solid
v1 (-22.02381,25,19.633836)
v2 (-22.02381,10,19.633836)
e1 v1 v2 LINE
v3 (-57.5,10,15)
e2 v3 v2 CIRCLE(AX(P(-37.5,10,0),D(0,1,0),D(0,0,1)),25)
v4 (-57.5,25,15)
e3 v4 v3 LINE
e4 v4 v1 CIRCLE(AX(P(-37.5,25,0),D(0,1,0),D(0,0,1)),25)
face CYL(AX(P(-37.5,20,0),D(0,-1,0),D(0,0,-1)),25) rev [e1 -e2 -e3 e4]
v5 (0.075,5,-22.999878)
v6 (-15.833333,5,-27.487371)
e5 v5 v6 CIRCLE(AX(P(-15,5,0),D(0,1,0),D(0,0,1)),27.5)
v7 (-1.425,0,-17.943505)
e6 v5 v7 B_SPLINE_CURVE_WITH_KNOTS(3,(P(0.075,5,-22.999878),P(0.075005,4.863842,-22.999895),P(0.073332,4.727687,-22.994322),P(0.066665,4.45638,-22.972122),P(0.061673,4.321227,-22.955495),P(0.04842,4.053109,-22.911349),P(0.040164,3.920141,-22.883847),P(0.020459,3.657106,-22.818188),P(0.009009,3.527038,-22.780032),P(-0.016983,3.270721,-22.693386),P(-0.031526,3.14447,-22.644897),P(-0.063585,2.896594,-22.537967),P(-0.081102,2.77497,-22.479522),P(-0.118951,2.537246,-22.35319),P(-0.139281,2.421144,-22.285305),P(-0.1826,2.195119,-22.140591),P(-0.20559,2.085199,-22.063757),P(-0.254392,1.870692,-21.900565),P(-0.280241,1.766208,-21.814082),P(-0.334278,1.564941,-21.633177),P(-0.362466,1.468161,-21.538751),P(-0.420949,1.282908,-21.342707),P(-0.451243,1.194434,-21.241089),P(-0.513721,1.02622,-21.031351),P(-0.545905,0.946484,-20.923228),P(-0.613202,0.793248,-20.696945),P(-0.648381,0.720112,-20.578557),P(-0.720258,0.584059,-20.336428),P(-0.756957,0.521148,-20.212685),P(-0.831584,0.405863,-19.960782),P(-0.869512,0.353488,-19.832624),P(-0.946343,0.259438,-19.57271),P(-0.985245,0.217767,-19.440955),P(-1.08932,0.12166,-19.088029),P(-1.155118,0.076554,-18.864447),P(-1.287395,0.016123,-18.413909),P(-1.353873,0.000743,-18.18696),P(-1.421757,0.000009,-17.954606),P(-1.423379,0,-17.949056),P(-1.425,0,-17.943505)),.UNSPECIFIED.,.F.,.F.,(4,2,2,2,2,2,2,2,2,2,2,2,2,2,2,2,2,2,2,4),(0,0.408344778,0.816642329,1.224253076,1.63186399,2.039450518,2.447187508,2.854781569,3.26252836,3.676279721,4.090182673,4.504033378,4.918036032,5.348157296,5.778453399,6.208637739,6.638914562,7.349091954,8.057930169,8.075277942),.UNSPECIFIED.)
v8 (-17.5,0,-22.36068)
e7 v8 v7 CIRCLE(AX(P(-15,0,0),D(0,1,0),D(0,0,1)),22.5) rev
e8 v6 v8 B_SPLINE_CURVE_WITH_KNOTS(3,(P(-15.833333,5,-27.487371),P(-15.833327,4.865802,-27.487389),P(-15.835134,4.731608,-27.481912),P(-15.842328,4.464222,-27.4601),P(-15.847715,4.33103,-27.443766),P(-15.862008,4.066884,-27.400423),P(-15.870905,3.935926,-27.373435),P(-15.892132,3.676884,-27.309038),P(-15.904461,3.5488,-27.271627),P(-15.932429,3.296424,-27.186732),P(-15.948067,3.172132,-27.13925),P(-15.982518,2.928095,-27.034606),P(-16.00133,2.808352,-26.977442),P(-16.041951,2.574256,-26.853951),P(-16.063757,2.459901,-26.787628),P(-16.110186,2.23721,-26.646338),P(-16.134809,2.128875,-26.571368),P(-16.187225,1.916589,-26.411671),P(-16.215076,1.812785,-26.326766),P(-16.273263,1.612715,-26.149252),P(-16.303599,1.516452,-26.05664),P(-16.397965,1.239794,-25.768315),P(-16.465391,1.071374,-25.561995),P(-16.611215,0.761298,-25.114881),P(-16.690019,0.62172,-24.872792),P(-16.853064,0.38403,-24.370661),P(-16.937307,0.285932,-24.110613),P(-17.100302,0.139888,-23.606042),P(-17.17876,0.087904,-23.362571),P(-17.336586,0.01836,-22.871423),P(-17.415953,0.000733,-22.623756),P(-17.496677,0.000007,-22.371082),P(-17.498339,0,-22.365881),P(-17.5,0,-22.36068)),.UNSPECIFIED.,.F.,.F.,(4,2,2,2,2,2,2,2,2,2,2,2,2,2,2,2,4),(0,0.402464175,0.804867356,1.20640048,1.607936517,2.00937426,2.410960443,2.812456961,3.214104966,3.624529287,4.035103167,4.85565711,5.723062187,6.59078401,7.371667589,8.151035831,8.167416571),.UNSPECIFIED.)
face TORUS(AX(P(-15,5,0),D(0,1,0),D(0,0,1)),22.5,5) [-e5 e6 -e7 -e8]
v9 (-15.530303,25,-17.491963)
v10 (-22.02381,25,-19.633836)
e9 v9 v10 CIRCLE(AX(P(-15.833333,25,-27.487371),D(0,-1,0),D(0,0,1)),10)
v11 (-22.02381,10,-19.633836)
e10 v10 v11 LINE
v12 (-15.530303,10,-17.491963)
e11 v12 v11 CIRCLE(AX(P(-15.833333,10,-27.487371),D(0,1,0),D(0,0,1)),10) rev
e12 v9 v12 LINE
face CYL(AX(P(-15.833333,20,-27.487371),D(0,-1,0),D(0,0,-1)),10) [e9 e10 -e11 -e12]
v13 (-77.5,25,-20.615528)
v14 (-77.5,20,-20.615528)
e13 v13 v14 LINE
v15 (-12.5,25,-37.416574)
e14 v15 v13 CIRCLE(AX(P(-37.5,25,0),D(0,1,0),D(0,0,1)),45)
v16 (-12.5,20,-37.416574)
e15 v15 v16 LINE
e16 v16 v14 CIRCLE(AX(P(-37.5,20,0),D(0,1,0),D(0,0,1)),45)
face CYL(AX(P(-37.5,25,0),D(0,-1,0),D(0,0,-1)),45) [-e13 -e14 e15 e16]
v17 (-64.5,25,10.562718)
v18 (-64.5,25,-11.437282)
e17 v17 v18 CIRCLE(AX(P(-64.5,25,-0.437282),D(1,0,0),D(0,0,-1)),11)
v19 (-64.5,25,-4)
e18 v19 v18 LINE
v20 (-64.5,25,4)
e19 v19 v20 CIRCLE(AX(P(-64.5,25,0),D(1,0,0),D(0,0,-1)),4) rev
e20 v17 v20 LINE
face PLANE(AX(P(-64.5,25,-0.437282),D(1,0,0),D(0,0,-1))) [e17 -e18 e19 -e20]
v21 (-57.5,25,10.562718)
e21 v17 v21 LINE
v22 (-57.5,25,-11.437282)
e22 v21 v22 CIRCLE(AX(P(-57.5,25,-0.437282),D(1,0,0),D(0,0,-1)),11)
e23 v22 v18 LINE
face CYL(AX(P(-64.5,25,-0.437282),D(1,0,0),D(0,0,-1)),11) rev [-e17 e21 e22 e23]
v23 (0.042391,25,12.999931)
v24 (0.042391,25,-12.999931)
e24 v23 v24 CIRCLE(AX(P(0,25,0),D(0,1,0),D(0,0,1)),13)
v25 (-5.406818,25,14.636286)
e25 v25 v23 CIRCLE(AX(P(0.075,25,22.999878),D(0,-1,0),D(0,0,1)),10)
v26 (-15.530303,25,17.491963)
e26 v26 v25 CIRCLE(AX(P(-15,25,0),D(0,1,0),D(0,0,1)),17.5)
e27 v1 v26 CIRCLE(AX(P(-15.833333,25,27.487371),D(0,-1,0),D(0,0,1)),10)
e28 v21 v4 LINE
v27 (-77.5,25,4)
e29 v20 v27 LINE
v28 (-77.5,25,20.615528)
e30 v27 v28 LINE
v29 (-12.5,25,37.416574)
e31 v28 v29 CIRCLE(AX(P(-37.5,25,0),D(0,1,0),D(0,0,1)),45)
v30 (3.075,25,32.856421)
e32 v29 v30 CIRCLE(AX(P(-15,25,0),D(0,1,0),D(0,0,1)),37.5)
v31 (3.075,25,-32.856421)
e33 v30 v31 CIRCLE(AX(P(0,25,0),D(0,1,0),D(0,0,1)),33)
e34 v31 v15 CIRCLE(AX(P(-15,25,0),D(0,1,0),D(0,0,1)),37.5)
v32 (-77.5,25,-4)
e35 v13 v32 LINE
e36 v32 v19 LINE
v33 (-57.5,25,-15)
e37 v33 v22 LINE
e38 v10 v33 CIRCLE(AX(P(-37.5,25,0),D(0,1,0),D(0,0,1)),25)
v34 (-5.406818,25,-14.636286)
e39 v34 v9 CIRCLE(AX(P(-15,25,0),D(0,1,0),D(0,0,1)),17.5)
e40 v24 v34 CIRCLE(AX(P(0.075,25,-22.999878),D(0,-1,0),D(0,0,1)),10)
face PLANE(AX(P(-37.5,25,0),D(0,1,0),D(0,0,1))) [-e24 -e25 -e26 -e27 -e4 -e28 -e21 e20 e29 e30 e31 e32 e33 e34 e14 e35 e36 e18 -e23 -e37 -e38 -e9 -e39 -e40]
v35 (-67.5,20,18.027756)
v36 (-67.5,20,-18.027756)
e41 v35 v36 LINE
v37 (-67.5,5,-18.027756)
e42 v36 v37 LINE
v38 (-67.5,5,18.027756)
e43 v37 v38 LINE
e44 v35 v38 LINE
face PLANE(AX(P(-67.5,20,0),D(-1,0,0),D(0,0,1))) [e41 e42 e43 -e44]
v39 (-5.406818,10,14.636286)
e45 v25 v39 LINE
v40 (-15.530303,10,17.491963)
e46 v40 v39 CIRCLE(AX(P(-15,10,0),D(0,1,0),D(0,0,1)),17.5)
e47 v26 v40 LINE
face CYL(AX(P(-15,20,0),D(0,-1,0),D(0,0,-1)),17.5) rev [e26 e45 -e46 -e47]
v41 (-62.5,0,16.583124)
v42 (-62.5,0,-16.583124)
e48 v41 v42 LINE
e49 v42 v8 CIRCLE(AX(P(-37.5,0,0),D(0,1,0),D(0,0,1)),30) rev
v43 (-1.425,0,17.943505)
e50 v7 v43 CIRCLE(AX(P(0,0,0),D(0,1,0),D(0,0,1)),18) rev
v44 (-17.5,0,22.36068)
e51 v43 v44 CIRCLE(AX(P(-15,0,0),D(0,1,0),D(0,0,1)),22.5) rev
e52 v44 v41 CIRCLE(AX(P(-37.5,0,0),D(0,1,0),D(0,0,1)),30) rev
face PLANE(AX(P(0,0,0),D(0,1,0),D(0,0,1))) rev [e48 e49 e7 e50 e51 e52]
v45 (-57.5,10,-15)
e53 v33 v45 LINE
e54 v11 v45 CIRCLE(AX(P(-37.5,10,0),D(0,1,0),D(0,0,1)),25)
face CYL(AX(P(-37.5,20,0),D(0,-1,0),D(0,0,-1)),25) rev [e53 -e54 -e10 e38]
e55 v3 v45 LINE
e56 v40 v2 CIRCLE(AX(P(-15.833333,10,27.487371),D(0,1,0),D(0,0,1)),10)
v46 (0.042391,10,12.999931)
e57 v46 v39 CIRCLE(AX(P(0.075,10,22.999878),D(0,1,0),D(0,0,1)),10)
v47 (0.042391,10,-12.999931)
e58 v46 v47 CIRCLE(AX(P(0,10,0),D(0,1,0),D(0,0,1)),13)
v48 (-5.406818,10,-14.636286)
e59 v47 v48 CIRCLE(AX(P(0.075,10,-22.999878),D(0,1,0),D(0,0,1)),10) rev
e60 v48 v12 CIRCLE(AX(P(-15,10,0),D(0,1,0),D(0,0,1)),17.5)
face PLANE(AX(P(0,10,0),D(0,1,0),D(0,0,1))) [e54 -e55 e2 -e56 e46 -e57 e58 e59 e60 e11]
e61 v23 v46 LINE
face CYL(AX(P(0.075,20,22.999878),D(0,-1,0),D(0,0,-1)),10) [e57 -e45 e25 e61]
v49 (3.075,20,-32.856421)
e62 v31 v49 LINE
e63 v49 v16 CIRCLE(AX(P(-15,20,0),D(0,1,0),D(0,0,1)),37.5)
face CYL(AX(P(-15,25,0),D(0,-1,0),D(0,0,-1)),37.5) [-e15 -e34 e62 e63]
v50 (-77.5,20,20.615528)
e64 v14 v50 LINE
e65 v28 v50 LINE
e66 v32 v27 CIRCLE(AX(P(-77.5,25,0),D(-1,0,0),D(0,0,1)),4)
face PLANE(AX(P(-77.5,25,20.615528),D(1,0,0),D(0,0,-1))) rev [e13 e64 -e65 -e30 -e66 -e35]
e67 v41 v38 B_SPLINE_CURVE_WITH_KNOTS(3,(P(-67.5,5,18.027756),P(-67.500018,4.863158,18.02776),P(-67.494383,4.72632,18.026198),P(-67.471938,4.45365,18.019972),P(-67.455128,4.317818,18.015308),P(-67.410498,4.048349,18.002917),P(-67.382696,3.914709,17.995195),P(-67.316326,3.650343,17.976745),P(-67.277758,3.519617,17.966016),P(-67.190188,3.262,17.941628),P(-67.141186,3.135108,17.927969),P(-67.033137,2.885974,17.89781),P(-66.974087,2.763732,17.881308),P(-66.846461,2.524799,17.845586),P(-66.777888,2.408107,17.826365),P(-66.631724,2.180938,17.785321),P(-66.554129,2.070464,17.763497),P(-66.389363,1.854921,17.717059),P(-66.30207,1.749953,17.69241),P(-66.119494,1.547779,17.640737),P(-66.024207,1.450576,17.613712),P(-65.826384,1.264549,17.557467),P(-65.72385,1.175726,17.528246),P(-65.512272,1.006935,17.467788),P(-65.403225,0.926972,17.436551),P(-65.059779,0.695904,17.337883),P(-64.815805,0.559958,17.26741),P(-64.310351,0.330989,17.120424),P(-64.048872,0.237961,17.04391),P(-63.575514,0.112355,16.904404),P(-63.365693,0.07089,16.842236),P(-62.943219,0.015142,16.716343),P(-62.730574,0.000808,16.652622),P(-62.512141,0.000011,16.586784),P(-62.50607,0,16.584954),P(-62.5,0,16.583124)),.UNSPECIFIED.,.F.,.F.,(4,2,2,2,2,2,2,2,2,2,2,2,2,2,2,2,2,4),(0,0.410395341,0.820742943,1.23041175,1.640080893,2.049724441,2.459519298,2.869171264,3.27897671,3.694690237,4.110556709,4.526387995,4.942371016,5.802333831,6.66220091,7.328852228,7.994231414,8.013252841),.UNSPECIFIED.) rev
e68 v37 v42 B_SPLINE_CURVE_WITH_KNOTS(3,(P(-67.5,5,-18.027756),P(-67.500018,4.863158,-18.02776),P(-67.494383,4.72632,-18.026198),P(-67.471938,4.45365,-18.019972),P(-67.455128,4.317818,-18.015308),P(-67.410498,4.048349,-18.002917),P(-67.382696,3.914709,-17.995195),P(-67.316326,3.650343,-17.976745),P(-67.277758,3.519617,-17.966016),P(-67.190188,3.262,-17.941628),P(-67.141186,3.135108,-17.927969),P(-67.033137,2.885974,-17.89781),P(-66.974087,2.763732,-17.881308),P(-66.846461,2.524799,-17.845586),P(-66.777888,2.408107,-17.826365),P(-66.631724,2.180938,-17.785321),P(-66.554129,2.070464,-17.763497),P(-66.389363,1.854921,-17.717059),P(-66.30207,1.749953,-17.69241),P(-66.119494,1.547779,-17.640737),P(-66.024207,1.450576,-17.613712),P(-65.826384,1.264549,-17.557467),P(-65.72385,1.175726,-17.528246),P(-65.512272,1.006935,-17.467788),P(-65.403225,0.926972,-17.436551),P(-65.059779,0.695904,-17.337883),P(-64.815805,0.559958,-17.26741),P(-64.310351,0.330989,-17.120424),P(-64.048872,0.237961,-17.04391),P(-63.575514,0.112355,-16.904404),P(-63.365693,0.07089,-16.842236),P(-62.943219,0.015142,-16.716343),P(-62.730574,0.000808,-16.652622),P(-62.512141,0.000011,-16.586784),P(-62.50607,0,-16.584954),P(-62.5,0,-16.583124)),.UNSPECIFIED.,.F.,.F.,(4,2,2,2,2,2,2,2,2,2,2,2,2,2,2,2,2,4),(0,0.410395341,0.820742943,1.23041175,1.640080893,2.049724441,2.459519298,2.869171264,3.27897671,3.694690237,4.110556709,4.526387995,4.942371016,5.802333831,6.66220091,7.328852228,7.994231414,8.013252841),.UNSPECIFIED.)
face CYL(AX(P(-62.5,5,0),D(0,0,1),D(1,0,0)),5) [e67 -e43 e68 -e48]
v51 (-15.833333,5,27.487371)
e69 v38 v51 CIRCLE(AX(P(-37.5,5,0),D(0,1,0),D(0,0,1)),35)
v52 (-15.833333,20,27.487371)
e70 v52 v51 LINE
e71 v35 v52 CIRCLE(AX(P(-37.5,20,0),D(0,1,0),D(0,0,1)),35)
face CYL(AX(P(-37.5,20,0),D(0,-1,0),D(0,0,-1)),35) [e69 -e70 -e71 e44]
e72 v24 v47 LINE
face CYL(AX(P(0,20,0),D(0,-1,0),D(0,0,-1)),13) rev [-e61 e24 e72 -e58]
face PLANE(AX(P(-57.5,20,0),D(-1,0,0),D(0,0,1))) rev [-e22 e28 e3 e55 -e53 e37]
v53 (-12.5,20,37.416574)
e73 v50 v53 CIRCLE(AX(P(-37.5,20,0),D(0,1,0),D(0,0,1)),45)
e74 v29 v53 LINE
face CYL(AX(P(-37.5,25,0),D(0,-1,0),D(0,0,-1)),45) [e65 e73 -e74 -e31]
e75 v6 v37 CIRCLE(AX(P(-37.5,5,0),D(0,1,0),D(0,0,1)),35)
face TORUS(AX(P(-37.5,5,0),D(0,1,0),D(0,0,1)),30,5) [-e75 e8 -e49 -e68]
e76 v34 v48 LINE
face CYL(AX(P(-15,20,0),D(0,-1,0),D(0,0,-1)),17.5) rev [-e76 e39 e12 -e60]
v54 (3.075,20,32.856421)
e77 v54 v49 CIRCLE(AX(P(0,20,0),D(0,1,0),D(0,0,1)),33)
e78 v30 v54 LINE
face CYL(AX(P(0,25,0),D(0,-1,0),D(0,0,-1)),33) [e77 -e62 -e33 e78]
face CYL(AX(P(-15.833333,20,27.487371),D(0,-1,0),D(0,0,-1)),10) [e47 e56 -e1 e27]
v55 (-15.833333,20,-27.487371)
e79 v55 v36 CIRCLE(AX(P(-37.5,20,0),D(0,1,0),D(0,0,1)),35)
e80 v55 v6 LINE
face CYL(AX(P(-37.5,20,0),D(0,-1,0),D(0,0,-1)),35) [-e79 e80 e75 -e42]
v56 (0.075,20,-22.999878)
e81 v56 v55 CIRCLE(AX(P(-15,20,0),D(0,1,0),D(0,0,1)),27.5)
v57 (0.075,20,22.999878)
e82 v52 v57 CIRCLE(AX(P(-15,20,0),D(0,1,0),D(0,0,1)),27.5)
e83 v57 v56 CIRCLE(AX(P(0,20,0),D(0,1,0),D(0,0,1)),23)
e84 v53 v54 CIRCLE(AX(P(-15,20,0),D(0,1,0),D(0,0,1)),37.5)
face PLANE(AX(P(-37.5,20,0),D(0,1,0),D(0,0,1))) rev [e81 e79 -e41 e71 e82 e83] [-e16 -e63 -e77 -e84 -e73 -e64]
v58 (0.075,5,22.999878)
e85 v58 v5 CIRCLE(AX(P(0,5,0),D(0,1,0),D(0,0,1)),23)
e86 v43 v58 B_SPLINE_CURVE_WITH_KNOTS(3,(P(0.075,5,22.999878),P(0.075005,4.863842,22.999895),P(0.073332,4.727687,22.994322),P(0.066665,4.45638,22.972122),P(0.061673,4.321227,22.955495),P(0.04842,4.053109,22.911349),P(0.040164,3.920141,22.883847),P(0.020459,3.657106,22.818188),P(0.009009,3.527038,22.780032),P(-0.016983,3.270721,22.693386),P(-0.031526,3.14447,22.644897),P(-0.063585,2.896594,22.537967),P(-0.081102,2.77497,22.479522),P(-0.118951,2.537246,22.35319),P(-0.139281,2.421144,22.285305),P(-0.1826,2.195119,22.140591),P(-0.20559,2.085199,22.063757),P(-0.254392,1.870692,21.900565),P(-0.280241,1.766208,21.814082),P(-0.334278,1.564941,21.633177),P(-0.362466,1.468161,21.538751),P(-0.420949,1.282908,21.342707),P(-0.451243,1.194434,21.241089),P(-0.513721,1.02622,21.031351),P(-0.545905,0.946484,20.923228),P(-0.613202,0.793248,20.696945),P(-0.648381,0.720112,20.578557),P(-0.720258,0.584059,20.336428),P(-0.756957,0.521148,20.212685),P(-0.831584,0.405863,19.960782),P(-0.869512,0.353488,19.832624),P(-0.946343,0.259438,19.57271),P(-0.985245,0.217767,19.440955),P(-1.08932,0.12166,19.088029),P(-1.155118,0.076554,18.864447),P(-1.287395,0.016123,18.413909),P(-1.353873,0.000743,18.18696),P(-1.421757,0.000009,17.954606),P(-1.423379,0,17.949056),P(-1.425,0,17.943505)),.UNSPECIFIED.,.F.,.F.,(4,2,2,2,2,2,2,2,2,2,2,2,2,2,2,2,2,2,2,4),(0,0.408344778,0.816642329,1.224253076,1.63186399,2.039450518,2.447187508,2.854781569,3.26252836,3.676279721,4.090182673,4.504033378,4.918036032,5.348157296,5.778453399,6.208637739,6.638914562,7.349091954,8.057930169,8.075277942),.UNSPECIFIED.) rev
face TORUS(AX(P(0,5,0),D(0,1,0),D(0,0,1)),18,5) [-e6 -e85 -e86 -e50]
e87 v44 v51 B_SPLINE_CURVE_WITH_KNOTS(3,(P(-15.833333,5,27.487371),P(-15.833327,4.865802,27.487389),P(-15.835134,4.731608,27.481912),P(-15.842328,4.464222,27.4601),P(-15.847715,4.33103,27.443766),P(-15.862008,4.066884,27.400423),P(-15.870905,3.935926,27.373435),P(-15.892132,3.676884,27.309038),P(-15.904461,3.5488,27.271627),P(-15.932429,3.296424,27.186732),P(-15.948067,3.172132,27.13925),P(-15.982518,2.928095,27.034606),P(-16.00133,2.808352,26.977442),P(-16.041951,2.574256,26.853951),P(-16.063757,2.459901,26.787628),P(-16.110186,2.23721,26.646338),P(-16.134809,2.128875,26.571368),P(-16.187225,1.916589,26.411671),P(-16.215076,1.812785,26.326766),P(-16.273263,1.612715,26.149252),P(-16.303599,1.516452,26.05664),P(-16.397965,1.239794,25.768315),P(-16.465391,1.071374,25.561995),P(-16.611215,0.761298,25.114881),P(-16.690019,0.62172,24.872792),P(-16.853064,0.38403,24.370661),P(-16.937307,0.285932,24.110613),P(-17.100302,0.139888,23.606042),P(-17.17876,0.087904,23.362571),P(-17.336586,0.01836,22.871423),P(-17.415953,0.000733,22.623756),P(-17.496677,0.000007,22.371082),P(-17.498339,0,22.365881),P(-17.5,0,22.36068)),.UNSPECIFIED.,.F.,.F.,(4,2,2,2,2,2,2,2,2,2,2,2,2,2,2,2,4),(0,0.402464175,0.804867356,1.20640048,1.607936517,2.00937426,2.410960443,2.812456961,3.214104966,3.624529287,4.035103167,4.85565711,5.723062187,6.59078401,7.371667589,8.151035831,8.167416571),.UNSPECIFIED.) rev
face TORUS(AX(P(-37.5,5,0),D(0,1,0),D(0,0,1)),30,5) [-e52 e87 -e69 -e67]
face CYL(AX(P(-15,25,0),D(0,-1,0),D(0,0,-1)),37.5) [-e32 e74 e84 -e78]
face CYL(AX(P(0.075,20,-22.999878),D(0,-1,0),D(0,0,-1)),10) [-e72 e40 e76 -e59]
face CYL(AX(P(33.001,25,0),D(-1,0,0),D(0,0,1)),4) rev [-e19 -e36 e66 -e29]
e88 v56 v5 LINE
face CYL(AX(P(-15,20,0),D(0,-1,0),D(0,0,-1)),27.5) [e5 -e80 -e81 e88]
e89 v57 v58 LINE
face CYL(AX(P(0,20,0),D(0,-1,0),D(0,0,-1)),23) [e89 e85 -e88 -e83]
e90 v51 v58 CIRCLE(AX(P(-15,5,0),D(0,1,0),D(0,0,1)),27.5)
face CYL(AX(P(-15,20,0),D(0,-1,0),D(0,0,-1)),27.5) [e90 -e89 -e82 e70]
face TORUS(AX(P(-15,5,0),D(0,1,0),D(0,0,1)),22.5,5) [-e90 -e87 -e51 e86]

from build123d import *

# Parameters (mm, degrees)
SKETCH1_R           = 4
SKETCH1_R_2         = 11
BOSS_EXTRUDE1_DEPTH = 10
BOSS_EXTRUDE2_DEPTH = 20
BOSS_EXTRUDE3_DEPTH = 5
SKETCH6_R           = 11
CUT_EXTRUDE2_DEPTH  = 7
CUT_EXTRUDE3_REACH  = 123.903
SKETCH3_R           = 4
FILLET1_R           = 5


with BuildPart() as part:
    # Sketch1 → Boss-Extrude1 (new body)
    # profile 1 of 4: a face of its own
    with BuildSketch(Plane(origin=(0, 0, 0), x_dir=(1, 0, 0), z_dir=(0, 1, 0))):
        with BuildLine():
            ThreePointArc((-15.53030303, -17.49196326), (-18.965809959, -17.990656132), (-22.023809524, -19.633836312))
            ThreePointArc((-22.023809524, -19.633836312), (-40.737950416, -24.78942672), (-57.5, -15))
            Line((-57.5, -15), (-57.5, 15))
            ThreePointArc((-57.5, 15), (-40.737950416, 24.78942672), (-22.023809524, 19.633836312))
            ThreePointArc((-22.023809524, 19.633836312), (-18.965809959, 17.990656132), (-15.53030303, 17.49196326))
            ThreePointArc((-15.53030303, 17.49196326), (-10.248929974, 16.842723462), (-5.406818182, 14.63628582))
            ThreePointArc((-5.406818182, 14.63628582), (-2.801045952, 13.422385369), (0.042391304, 12.999930884))
            ThreePointArc((0.042391304, 12.999930884), (13, 0), (0.042391304, -12.999930884))
            ThreePointArc((0.042391304, -12.999930884), (-2.801045952, -13.422385369), (-5.406818182, -14.63628582))
            ThreePointArc((-5.406818182, -14.63628582), (-10.248929974, -16.842723462), (-15.53030303, -17.49196326))
        make_face()
        with Locations((-37.5, 0)):
            Circle(SKETCH1_R, mode=Mode.SUBTRACT)
        Circle(SKETCH1_R_2, mode=Mode.SUBTRACT)
        with Locations((-15, 0)):
            Circle(SKETCH1_R, mode=Mode.SUBTRACT)
    # profile 2 of 4: a face of its own
    with BuildSketch(Plane(origin=(0, 0, 0), x_dir=(1, 0, 0), z_dir=(0, 1, 0))):
        with Locations((-37.5, 0)):
            Circle(SKETCH1_R)
    # profile 3 of 4: a face of its own
    with BuildSketch(Plane(origin=(0, 0, 0), x_dir=(1, 0, 0), z_dir=(0, 1, 0))):
        with Locations((-15, 0)):
            Circle(SKETCH1_R)
    # profile 4 of 4: a face of its own
    with BuildSketch(Plane(origin=(0, 0, 0), x_dir=(1, 0, 0), z_dir=(0, 1, 0))):
        Circle(SKETCH1_R_2)
    extrude(amount=BOSS_EXTRUDE1_DEPTH)

    # Sketch1<3> → Boss-Extrude2 (add)
    with BuildSketch(Plane(origin=(0, 0, 0), x_dir=(1, 0, 0), z_dir=(0, 1, 0))):
        with BuildLine():
            Line((-67.5, -18.027756377), (-67.5, 18.027756377))
            ThreePointArc((-67.5, 18.027756377), (-43.803347329, 34.427718665), (-15.833333333, 27.487370837))
            ThreePointArc((-15.833333333, 27.487370837), (-7.534032816, 26.467136868), (0.075, 22.999877717))
            ThreePointArc((0.075, 22.999877717), (23, 0), (0.075, -22.999877717))
            ThreePointArc((0.075, -22.999877717), (-7.534032816, -26.467136868), (-15.833333333, -27.487370837))
            ThreePointArc((-15.833333333, -27.487370837), (-43.803347329, -34.427718665), (-67.5, -18.027756377))
        make_face()
        with BuildLine():
            Line((-57.5, -15), (-57.5, 15))
            ThreePointArc((-57.5, 15), (-40.737950416, 24.78942672), (-22.023809524, 19.633836312))
            ThreePointArc((-22.023809524, 19.633836312), (-18.965809959, 17.990656132), (-15.53030303, 17.49196326))
            ThreePointArc((-15.53030303, 17.49196326), (-10.248929974, 16.842723462), (-5.406818182, 14.63628582))
            ThreePointArc((-5.406818182, 14.63628582), (-2.801045952, 13.422385369), (0.042391304, 12.999930884))
            ThreePointArc((0.042391304, 12.999930884), (13, 0), (0.042391304, -12.999930884))
            ThreePointArc((0.042391304, -12.999930884), (-2.801045952, -13.422385369), (-5.406818182, -14.63628582))
            ThreePointArc((-5.406818182, -14.63628582), (-10.248929974, -16.842723462), (-15.53030303, -17.49196326))
            ThreePointArc((-15.53030303, -17.49196326), (-18.965809959, -17.990656132), (-22.023809524, -19.633836312))
            ThreePointArc((-22.023809524, -19.633836312), (-40.737950416, -24.78942672), (-57.5, -15))
        make_face(mode=Mode.SUBTRACT)
    extrude(amount=BOSS_EXTRUDE2_DEPTH)

    # Sketch2 → Boss-Extrude3 (add)
    with BuildSketch(Plane(origin=(0, 20, 0), x_dir=(1, 0, 0), z_dir=(0, 1, 0))):
        with BuildLine():
            Line((-77.5, -20.615528128), (-77.5, 20.615528128))
            ThreePointArc((-77.5, 20.615528128), (-48.761384661, 43.568121551), (-12.5, 37.416573868))
            ThreePointArc((-12.5, 37.416573868), (-4.462855904, 35.989145507), (3.075, 32.856420605))
            ThreePointArc((3.075, 32.856420605), (33, 0), (3.075, -32.856420605))
            ThreePointArc((3.075, -32.856420605), (-4.462855904, -35.989145507), (-12.5, -37.416573868))
            ThreePointArc((-12.5, -37.416573868), (-48.761384661, -43.568121551), (-77.5, -20.615528128))
        make_face()
        with BuildLine():
            Line((-57.5, -15), (-57.5, 15))
            ThreePointArc((-57.5, 15), (-40.737950416, 24.78942672), (-22.023809524, 19.633836312))
            ThreePointArc((-22.023809524, 19.633836312), (-18.965809959, 17.990656132), (-15.53030303, 17.49196326))
            ThreePointArc((-15.53030303, 17.49196326), (-10.248929974, 16.842723462), (-5.406818182, 14.63628582))
            ThreePointArc((-5.406818182, 14.63628582), (-2.801045952, 13.422385369), (0.042391304, 12.999930884))
            ThreePointArc((0.042391304, 12.999930884), (13, 0), (0.042391304, -12.999930884))
            ThreePointArc((0.042391304, -12.999930884), (-2.801045952, -13.422385369), (-5.406818182, -14.63628582))
            ThreePointArc((-5.406818182, -14.63628582), (-10.248929974, -16.842723462), (-15.53030303, -17.49196326))
            ThreePointArc((-15.53030303, -17.49196326), (-18.965809959, -17.990656132), (-22.023809524, -19.633836312))
            ThreePointArc((-22.023809524, -19.633836312), (-40.737950416, -24.78942672), (-57.5, -15))
        make_face(mode=Mode.SUBTRACT)
    extrude(amount=BOSS_EXTRUDE3_DEPTH)

    # Sketch6 → Cut-Extrude2 (cut)
    with BuildSketch(Plane(origin=(-57.5, 0, 0), x_dir=(0, 0, -1), z_dir=(1, 0, 0))):
        with Locations((0.437281594, 25)):
            Circle(SKETCH6_R)
    extrude(amount=-CUT_EXTRUDE2_DEPTH, mode=Mode.SUBTRACT)

    # Sketch3 → Cut-Extrude3 (cut, up to next)
    with BuildSketch(Plane.ZY.offset(77.5), mode=Mode.PRIVATE) as cut_extrude3_sk1:
        with Locations((0, 25)):
            Circle(SKETCH3_R)
    cut_extrude3_tool1 = extrude(cut_extrude3_sk1.sketch, amount=-CUT_EXTRUDE3_REACH, mode=Mode.PRIVATE) & part.part
    add(cut_extrude3_tool1.solids().sort_by_distance((-77.5, 25, 0))[0], mode=Mode.SUBTRACT)

    # Fillet1
    fillet1_edges = [part.edges().sort_by_distance(p)[0] for p in [
        (-43.803347329, 0, 34.427718665),
        (-7.534032816, 0, 26.467136868),
        (23, 0, 0),
        (-7.534032816, 0, -26.467136868),
        (-43.803347329, 0, -34.427718665),
        (-67.5, 0, 0),
    ]]
    fillet(fillet1_edges, radius=FILLET1_R - 0.0001)  # a hair under: the kernel refuses the full size


solid = part.part
